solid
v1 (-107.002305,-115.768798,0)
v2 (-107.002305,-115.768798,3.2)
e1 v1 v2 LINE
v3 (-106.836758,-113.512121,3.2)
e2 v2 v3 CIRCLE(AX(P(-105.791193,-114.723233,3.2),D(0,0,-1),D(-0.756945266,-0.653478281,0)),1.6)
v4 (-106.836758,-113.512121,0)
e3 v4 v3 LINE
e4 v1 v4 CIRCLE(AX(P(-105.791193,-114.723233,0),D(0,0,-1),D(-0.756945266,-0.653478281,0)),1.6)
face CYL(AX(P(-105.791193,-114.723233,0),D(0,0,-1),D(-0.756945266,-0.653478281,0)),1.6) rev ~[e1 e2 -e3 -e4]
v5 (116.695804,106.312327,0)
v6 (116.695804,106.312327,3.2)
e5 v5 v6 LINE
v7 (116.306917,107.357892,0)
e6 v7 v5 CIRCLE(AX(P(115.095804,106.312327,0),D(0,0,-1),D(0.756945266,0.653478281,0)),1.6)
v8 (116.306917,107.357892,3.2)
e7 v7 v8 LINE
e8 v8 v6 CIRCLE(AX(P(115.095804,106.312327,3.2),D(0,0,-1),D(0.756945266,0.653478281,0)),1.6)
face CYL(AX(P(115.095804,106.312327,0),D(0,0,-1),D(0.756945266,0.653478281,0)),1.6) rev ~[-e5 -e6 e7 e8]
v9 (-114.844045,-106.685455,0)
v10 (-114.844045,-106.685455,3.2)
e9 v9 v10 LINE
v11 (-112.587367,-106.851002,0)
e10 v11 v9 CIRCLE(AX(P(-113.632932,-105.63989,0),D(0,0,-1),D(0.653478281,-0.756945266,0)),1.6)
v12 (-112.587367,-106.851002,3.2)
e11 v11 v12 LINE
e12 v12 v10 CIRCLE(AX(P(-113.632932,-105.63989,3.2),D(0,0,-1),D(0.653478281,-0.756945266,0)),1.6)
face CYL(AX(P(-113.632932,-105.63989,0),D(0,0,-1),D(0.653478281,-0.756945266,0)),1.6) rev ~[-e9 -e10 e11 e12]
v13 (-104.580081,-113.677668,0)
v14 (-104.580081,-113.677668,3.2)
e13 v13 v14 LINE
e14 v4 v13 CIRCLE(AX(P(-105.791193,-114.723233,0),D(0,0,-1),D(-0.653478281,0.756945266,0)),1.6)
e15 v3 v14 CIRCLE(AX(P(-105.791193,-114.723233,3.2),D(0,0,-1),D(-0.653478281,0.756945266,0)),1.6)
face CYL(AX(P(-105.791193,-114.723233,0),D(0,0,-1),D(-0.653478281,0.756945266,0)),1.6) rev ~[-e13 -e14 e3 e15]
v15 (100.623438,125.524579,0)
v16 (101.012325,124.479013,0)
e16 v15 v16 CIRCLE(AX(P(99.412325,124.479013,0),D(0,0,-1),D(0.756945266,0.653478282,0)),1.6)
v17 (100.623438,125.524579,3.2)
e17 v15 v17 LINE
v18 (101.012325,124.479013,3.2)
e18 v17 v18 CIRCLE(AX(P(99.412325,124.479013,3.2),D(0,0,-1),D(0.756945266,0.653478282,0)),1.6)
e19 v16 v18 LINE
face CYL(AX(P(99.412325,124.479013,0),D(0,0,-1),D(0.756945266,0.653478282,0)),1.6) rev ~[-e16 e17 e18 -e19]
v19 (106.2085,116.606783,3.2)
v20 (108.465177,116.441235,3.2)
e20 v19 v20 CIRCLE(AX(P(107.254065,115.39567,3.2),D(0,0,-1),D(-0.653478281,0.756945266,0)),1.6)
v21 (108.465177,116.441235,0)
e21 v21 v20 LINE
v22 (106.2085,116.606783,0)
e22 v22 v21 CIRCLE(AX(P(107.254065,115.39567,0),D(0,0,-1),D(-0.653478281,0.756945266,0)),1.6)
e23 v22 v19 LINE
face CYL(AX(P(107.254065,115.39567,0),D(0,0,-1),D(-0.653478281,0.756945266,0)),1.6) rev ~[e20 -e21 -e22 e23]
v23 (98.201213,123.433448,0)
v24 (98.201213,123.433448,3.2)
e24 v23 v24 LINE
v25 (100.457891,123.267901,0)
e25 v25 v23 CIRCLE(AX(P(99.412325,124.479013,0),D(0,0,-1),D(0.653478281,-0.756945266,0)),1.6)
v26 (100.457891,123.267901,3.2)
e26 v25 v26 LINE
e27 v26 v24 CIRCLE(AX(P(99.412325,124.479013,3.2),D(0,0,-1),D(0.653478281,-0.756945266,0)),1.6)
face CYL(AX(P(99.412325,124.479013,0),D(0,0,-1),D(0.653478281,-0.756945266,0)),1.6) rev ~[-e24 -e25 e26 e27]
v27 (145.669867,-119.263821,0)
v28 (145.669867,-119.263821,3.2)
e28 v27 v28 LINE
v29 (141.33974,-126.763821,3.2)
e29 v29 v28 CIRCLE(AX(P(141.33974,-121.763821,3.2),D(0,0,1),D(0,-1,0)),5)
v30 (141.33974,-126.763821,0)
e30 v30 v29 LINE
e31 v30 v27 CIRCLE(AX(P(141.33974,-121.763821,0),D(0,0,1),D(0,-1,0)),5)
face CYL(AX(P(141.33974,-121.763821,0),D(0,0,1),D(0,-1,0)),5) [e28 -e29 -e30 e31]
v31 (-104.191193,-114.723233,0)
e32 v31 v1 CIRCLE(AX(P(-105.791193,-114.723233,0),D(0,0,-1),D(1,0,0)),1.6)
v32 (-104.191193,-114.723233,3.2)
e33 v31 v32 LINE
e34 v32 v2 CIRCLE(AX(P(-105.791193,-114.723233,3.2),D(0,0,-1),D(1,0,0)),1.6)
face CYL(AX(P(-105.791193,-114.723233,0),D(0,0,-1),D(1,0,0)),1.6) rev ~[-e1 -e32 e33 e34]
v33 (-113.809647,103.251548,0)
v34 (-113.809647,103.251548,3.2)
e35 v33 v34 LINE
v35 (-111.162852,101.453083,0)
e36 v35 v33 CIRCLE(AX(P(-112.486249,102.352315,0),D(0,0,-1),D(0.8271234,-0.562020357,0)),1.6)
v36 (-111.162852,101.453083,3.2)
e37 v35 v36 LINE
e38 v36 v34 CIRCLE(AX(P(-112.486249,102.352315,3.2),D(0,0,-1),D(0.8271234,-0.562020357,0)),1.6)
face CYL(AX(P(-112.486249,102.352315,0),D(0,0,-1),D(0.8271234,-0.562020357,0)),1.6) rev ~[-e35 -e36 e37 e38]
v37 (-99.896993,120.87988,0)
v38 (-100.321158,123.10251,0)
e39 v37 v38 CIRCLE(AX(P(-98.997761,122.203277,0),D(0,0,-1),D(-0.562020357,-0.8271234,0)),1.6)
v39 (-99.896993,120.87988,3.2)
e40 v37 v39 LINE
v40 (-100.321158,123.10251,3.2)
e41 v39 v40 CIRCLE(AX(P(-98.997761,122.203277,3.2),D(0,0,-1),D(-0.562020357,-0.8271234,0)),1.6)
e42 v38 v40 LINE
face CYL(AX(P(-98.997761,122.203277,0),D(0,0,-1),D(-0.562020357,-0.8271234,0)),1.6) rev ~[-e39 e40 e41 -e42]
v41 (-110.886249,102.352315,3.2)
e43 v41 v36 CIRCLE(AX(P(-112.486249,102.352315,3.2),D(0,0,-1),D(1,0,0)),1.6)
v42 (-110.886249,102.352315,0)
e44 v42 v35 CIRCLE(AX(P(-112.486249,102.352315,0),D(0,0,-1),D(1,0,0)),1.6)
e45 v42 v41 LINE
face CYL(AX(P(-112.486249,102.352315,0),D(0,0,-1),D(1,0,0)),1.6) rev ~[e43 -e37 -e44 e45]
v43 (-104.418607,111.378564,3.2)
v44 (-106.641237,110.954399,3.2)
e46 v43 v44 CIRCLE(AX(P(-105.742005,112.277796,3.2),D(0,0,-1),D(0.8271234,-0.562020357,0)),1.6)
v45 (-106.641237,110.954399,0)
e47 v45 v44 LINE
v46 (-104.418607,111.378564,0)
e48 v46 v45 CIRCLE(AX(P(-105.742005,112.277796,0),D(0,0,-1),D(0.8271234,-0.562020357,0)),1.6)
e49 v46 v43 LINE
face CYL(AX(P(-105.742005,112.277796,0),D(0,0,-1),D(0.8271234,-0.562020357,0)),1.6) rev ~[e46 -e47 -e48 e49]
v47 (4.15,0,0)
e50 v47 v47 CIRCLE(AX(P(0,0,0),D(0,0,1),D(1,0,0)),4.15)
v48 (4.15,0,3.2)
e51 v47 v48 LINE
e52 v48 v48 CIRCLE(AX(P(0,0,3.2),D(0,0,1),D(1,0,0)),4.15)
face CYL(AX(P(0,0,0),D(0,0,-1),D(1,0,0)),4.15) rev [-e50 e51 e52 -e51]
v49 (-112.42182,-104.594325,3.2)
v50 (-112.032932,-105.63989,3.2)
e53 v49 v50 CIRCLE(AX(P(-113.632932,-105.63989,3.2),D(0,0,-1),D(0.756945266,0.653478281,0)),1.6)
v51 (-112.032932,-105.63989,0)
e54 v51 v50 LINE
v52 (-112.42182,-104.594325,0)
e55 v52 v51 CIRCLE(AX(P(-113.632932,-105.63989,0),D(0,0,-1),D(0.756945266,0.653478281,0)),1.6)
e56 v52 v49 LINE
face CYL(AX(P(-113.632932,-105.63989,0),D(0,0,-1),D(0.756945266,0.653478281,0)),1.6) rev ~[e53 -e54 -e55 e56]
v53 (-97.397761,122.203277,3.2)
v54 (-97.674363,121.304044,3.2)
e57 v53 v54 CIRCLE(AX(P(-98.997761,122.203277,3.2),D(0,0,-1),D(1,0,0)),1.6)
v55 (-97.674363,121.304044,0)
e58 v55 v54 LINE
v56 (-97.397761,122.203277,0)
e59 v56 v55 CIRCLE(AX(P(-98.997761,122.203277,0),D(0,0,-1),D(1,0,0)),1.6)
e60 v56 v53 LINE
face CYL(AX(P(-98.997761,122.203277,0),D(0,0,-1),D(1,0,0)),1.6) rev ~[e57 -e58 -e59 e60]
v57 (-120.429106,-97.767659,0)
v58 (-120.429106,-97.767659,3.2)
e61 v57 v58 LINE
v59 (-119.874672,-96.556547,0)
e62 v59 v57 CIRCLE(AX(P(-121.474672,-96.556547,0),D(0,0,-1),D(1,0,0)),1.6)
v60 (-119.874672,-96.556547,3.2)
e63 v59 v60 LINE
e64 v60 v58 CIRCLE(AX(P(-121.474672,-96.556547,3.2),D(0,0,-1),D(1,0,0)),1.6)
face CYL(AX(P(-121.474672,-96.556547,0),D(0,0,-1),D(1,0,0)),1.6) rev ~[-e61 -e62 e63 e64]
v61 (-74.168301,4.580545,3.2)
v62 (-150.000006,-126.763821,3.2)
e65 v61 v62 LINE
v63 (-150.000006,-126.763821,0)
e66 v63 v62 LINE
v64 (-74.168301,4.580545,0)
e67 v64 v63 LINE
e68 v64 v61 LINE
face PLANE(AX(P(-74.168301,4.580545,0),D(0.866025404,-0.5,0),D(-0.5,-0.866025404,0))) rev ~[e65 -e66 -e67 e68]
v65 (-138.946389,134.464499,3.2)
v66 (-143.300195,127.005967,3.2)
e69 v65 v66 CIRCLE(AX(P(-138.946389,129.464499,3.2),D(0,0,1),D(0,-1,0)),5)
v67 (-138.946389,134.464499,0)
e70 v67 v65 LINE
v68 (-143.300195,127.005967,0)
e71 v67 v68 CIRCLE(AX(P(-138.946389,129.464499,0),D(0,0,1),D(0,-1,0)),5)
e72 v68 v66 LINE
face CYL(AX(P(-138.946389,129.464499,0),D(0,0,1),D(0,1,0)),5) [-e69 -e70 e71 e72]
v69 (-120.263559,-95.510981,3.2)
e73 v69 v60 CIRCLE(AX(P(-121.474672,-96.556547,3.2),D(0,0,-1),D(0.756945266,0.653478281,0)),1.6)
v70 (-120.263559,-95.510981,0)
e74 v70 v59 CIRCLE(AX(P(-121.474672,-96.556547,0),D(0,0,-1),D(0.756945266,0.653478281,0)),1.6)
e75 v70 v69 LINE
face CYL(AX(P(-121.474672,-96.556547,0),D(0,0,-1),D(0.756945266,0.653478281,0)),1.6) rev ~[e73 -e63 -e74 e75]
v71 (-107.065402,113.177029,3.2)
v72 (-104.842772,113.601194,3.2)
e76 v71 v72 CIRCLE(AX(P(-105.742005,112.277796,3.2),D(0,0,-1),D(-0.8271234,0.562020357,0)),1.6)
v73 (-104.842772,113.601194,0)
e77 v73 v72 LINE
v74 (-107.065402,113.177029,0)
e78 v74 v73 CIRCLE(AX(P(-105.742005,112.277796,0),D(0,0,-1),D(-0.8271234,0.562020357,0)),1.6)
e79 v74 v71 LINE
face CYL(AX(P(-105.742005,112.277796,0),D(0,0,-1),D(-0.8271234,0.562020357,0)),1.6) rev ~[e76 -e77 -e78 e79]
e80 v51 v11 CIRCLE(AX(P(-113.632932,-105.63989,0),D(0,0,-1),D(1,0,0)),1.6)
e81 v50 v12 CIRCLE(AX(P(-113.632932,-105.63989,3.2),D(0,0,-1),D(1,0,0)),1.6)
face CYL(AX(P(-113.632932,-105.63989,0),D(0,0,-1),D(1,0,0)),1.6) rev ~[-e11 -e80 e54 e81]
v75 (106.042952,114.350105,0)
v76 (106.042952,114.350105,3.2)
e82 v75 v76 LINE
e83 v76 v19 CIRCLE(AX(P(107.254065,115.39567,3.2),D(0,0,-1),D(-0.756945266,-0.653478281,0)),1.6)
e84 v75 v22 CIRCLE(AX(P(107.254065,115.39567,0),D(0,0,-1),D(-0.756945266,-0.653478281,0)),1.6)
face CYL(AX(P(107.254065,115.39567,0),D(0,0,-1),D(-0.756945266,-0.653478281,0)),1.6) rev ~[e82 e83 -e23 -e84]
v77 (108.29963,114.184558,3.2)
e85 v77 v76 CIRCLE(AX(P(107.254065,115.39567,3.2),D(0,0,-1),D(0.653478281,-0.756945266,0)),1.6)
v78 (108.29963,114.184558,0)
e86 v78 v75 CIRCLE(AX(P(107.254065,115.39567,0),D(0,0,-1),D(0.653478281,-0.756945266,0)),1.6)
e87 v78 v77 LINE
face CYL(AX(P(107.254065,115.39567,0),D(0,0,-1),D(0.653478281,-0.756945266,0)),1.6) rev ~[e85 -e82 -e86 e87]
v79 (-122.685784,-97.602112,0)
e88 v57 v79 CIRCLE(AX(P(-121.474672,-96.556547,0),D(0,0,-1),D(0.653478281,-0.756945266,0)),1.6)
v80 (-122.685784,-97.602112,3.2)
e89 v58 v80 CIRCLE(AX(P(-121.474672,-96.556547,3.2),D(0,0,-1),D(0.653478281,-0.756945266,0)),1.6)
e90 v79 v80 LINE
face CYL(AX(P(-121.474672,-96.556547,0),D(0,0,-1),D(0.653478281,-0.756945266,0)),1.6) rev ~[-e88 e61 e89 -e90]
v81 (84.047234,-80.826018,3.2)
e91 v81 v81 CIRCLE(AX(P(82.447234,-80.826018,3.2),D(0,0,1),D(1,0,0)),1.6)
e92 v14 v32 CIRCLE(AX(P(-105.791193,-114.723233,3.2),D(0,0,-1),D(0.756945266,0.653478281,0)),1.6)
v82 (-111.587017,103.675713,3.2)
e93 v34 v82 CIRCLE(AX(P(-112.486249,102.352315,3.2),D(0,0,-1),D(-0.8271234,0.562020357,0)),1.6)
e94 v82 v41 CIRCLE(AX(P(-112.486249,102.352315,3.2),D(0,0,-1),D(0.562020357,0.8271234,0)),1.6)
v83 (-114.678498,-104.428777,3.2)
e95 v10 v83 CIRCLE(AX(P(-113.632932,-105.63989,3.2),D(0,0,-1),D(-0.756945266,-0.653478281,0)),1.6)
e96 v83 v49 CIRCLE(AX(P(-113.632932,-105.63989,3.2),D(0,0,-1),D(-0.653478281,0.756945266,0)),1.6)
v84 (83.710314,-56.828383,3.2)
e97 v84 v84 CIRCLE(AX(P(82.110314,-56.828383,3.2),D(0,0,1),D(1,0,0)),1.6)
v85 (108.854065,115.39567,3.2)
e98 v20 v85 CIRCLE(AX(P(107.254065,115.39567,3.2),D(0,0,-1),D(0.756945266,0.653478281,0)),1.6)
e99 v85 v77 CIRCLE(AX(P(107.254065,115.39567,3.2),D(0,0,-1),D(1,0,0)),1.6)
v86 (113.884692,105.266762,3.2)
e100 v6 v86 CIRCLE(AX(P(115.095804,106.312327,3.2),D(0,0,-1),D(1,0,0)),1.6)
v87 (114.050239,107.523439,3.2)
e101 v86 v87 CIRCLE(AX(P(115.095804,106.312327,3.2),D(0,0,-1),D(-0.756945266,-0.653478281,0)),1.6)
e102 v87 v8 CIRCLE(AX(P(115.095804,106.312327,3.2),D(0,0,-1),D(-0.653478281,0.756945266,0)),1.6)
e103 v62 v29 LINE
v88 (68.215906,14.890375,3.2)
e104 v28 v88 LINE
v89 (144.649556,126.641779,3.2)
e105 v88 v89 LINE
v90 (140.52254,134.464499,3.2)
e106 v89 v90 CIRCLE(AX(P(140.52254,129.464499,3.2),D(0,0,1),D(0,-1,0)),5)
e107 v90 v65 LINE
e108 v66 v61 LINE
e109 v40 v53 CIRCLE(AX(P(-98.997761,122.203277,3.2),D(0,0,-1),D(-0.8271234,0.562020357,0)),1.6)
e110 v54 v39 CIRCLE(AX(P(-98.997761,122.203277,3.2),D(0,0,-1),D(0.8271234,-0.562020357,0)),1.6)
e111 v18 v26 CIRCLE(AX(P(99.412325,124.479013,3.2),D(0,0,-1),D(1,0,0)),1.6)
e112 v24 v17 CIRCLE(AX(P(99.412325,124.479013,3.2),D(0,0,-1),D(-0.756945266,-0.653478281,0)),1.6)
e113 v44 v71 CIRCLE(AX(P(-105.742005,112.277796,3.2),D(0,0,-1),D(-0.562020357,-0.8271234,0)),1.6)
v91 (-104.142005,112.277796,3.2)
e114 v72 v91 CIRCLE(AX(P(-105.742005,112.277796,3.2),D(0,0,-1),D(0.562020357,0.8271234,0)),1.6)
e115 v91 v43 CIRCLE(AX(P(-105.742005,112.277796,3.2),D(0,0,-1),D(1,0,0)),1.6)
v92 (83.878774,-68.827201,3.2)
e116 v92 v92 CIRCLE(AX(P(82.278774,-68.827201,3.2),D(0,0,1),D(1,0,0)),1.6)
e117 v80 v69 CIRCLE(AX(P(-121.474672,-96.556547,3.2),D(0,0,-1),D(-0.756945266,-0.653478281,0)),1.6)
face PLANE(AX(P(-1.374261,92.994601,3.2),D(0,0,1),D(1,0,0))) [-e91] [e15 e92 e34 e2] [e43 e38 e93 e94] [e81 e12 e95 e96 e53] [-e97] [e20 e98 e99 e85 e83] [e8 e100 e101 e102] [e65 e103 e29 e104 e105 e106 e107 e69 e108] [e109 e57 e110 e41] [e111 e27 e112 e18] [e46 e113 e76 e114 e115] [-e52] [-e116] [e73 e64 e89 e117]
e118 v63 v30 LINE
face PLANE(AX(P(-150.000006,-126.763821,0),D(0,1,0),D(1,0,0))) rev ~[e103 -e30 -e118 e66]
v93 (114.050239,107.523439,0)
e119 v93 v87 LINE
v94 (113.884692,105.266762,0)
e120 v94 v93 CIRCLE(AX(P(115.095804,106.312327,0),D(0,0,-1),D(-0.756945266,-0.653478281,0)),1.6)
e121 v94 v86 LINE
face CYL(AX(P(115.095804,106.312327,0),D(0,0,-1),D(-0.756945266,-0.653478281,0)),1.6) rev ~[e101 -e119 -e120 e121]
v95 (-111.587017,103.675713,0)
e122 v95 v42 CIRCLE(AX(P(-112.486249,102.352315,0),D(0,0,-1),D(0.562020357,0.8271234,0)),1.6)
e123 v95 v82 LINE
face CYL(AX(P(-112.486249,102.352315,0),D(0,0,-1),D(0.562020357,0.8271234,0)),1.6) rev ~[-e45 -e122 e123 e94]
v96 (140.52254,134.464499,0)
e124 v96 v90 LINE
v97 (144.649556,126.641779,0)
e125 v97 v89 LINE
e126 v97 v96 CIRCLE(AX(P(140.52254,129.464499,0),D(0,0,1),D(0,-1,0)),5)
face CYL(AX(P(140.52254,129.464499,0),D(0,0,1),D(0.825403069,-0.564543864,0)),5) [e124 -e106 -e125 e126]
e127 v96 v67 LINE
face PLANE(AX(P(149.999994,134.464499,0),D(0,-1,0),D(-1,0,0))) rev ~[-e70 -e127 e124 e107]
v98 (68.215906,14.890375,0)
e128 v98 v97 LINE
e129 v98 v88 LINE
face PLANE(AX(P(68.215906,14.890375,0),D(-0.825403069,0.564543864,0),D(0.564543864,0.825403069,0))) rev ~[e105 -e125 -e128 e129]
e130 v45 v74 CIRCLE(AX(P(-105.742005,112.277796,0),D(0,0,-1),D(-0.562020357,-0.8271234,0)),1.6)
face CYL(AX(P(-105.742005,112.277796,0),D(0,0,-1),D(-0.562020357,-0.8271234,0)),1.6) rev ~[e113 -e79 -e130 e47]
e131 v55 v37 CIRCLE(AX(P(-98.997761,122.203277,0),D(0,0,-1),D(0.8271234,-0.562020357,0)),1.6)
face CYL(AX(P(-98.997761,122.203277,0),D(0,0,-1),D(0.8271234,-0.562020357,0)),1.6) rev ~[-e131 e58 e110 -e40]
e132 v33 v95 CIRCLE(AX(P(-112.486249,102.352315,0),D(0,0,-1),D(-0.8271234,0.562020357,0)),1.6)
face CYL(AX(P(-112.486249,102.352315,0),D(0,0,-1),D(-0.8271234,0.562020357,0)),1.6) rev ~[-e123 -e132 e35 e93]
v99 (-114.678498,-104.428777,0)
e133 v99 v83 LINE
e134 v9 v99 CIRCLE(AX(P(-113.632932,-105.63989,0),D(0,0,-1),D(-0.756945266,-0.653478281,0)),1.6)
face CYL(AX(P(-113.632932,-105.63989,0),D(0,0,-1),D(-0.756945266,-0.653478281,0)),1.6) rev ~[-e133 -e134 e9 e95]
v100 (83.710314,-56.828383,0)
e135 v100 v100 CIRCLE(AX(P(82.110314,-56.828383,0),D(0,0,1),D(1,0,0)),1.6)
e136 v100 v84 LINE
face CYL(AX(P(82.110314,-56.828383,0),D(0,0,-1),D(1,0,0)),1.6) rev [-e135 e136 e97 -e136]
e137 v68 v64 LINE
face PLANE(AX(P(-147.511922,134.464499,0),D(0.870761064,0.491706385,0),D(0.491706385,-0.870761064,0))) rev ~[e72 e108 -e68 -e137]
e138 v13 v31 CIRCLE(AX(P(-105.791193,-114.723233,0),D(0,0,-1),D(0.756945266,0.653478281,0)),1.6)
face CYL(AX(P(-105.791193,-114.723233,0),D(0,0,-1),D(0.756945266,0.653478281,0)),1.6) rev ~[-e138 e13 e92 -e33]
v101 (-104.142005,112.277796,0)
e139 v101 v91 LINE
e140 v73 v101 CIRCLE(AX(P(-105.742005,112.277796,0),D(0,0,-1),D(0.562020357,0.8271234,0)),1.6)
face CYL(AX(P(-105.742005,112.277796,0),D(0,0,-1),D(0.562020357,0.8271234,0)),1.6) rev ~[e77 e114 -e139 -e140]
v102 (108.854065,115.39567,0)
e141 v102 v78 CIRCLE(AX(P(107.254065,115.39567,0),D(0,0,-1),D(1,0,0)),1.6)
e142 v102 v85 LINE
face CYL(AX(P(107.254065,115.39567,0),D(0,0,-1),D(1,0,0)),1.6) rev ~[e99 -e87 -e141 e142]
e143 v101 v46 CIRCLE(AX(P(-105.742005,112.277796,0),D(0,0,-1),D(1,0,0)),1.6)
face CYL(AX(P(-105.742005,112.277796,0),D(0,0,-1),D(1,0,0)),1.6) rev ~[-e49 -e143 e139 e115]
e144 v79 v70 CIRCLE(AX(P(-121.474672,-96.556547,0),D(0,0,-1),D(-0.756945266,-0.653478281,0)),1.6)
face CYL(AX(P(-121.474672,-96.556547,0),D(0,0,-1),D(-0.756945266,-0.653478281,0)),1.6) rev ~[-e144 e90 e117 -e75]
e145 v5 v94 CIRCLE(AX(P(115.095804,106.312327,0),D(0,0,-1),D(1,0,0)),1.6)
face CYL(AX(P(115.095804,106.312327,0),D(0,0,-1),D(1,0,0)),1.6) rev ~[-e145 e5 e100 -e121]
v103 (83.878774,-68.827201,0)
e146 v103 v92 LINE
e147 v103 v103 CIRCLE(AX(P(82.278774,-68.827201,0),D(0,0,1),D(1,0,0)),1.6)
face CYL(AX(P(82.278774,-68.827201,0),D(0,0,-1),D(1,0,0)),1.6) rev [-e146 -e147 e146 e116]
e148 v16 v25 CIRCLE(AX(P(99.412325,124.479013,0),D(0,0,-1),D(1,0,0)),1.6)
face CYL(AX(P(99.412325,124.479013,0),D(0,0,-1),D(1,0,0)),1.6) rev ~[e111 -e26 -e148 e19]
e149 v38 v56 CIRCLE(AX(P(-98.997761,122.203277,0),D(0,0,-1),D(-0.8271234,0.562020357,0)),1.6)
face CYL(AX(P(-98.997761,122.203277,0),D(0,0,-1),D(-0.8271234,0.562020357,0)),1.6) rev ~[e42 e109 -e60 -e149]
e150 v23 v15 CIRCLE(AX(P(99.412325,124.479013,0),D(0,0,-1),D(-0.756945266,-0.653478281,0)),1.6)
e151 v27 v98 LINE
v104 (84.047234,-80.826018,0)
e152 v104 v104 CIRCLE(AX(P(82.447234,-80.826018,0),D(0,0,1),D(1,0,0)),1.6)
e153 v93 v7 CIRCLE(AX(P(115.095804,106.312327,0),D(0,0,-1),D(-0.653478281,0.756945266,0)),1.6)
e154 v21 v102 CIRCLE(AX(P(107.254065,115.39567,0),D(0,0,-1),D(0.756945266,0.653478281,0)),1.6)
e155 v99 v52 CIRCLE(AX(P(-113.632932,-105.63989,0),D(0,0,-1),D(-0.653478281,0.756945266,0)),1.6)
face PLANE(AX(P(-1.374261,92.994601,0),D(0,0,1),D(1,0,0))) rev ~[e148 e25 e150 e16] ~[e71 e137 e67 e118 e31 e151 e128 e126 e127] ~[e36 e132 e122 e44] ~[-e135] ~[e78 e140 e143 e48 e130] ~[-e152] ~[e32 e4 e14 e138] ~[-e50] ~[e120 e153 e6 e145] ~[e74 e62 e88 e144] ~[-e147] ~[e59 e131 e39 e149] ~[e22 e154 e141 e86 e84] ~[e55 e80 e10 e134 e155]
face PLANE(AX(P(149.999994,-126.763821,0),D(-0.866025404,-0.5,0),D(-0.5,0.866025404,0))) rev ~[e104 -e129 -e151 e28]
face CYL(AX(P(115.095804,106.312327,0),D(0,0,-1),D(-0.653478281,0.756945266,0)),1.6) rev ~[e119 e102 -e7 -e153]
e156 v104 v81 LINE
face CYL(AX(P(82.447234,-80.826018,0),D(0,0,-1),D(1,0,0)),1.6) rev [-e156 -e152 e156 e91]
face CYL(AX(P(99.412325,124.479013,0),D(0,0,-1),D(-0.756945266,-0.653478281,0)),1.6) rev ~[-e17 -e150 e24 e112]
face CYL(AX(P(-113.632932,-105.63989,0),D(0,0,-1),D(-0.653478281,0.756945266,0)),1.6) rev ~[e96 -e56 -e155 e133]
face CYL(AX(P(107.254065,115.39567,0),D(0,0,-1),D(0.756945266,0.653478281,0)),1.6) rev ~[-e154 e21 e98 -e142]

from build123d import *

# Parameters (mm, degrees)
F0_R     = 1.6
F0_R_2   = 4.15
F1_DEPTH = 3.2
F2_R     = 5


# Not quite as in the source:
# - a feature names something its author has since deleted; it is built from what else it names


with BuildPart() as f1:
    # F0 (on Top) → F1 (new body)
    with BuildSketch(Plane.XY):
        Polygon((-147.5119216098, 134.4644985315), (-74.1683009258, 4.5805452964), (-5.9605e-06, 133.0438004871), (68.2159057757, 14.8903754755), (149.9999940395, 134.4644985315), align=None)
        with BuildLine():
            Line((-96.8504283589, 106.236077336), (-103.5946726395, 96.3105965374))
            Line((-103.5946726395, 96.3105965374), (-111.1628517485, 101.4530828014))
            ThreePointArc((-111.1628517485, 101.4530828014), (-113.385481759, 101.0289179323), (-113.8096466281, 103.2515479429))
            Line((-113.8096466281, 103.2515479429), (-121.377825737, 108.3940342069))
            Line((-121.377825737, 108.3940342069), (-114.6335814564, 118.3195150055))
            Line((-114.6335814564, 118.3195150055), (-107.8893371757, 128.244995804))
            Line((-107.8893371757, 128.244995804), (-100.3211580668, 123.10250954))
            ThreePointArc((-100.3211580668, 123.10250954), (-98.5273543684, 123.7325637154), (-97.397760627, 122.2032769693))
            ThreePointArc((-97.397760627, 122.2032769693), (-97.4684738809, 121.7328707107), (-97.6743631872, 121.3040443985))
            Line((-97.6743631872, 121.3040443985), (-90.1061840783, 116.1615581346))
            Line((-90.1061840783, 116.1615581346), (-96.8504283589, 106.236077336))
        make_face(mode=Mode.SUBTRACT)
        with BuildLine():
            Line((115.3912264438, 122.4205616549), (123.2329658209, 113.3372184629))
            Line((123.2329658209, 113.3372184629), (116.306916637, 107.3578921879))
            ThreePointArc((116.306916637, 107.3578921879), (116.5954341459, 106.870099346), (116.6958042114, 106.3123269377))
            ThreePointArc((116.6958042114, 106.3123269377), (115.6535766198, 104.8126970032), (113.8846917858, 105.2667616874))
            Line((113.8846917858, 105.2667616874), (106.958642602, 99.2874354124))
            Line((106.958642602, 99.2874354124), (99.1169032249, 108.3707786044))
            Line((99.1169032249, 108.3707786044), (91.2751638479, 117.4541217963))
            Line((91.2751638479, 117.4541217963), (98.2012130318, 123.4334480713))
            ThreePointArc((98.2012130318, 123.4334480713), (98.3667602071, 125.6901257472), (100.6234378829, 125.5245785718))
            Line((100.6234378829, 125.5245785718), (107.5494870668, 131.5039048468))
            Line((107.5494870668, 131.5039048468), (115.3912264438, 122.4205616549))
        make_face(mode=Mode.SUBTRACT)
        Polygon((-74.1683009258, 4.5805452964), (-5.9605e-06, -126.7638206482), (49.5534456811, -23.8632776696), (68.2159057757, 14.8903754755), (-5.9605e-06, 133.0438004871), align=None)
        with BuildLine():
            ThreePointArc((55, 0), (53.6210756721, -12.2384739151), (49.5534456811, -23.8632776696))
            ThreePointArc((49.5534456811, -23.8632776696), (-53.6210756721, 12.2384739151), (55, 0))
        make_face(mode=Mode.SUBTRACT)
        Polygon((49.5534456811, -23.8632776696), (-5.9605e-06, -126.7638206482), (149.9999940395, -126.7638206482), (68.2159057757, 14.8903754755), align=None)
        with Locations((82.4472344942, -80.8260182953)):
            Circle(F0_R, mode=Mode.SUBTRACT)
        with Locations((82.2787740784, -68.8272008082)):
            Circle(F0_R, mode=Mode.SUBTRACT)
        with Locations((82.1103136625, -56.8283833211)):
            Circle(F0_R, mode=Mode.SUBTRACT)
        Polygon((-74.1683009258, 4.5805452964), (-150.0000059605, -126.7638206482), (-5.9605e-06, -126.7638206482), align=None)
        with BuildLine():
            Line((-105.4957706959, -98.6149983111), (-97.6540313188, -107.698341503))
            Line((-97.6540313188, -107.698341503), (-104.5800805027, -113.677667778))
            ThreePointArc((-104.5800805027, -113.677667778), (-104.2915629938, -114.1654606199), (-104.1911929283, -114.7232330283))
            ThreePointArc((-104.1911929283, -114.7232330283), (-105.2334205199, -116.2228629628), (-107.0023053539, -115.7687982785))
            Line((-107.0023053539, -115.7687982785), (-113.9283545378, -121.7481245535))
            Line((-113.9283545378, -121.7481245535), (-121.7700939148, -112.6647813616))
            Line((-121.7700939148, -112.6647813616), (-129.6118332918, -103.5814381696))
            Line((-129.6118332918, -103.5814381696), (-122.685784108, -97.6021118946))
            ThreePointArc((-122.685784108, -97.6021118946), (-122.5202369326, -95.3454342188), (-120.2635592568, -95.5109813941))
            Line((-120.2635592568, -95.5109813941), (-113.3375100729, -89.5316551191))
            Line((-113.3375100729, -89.5316551191), (-105.4957706959, -98.6149983111))
        make_face(mode=Mode.SUBTRACT)
        with BuildLine():
            ThreePointArc((55, 0), (-53.6210756721, 12.2384739151), (49.5534456811, -23.8632776696))
            ThreePointArc((49.5534456811, -23.8632776696), (53.6210756721, -12.2384739151), (55, 0))
        make_face()
        Circle(F0_R_2, mode=Mode.SUBTRACT)
        with BuildLine():
            Line((-111.1628517485, 101.4530828014), (-103.5946726395, 96.3105965374))
            Line((-103.5946726395, 96.3105965374), (-96.8504283589, 106.236077336))
            Line((-96.8504283589, 106.236077336), (-104.4186074678, 111.3785636))
            ThreePointArc((-104.4186074678, 111.3785636), (-105.4420750524, 110.7061594182), (-106.6412374784, 110.9543987309))
            Line((-106.6412374784, 110.9543987309), (-111.5870166175, 103.6757128119))
            ThreePointArc((-111.5870166175, 103.6757128119), (-111.0722527043, 103.1010569453), (-110.8862491883, 102.3523153721))
            ThreePointArc((-110.8862491883, 102.3523153721), (-110.9569624422, 101.8819091135), (-111.1628517485, 101.4530828014))
        make_face()
        with BuildLine():
            Line((-104.4186074678, 111.3785636), (-96.8504283589, 106.236077336))
            Line((-96.8504283589, 106.236077336), (-90.1061840783, 116.1615581346))
            Line((-90.1061840783, 116.1615581346), (-97.6743631872, 121.3040443985))
            ThreePointArc((-97.6743631872, 121.3040443985), (-98.6978307717, 120.6316402168), (-99.8969931977, 120.8798795295))
            Line((-99.8969931977, 120.8798795295), (-104.8427723369, 113.6011936105))
            ThreePointArc((-104.8427723369, 113.6011936105), (-104.3280084237, 113.0265377439), (-104.1420049076, 112.2777961707))
            ThreePointArc((-104.1420049076, 112.2777961707), (-104.2127181615, 111.8073899121), (-104.4186074678, 111.3785636))
        make_face()
        with BuildLine():
            Line((-121.377825737, 108.3940342069), (-113.8096466281, 103.2515479429))
            ThreePointArc((-113.8096466281, 103.2515479429), (-112.7861790435, 103.9239521247), (-111.5870166175, 103.6757128119))
            Line((-111.5870166175, 103.6757128119), (-106.6412374784, 110.9543987309))
            ThreePointArc((-106.6412374784, 110.9543987309), (-107.3136416602, 111.9778663155), (-107.0654023474, 113.1770287415))
            Line((-107.0654023474, 113.1770287415), (-114.6335814564, 118.3195150055))
            Line((-114.6335814564, 118.3195150055), (-121.377825737, 108.3940342069))
        make_face()
        with BuildLine():
            Line((-107.8893371757, 128.244995804), (-114.6335814564, 118.3195150055))
            Line((-114.6335814564, 118.3195150055), (-107.0654023474, 113.1770287415))
            ThreePointArc((-107.0654023474, 113.1770287415), (-106.0419347629, 113.8494329232), (-104.8427723369, 113.6011936105))
            Line((-104.8427723369, 113.6011936105), (-99.8969931977, 120.8798795295))
            ThreePointArc((-99.8969931977, 120.8798795295), (-100.5693973795, 121.903347114), (-100.3211580668, 123.10250954))
            Line((-100.3211580668, 123.10250954), (-107.8893371757, 128.244995804))
        make_face()
        with BuildLine():
            Line((-104.5800805027, -113.677667778), (-97.6540313188, -107.698341503))
            Line((-97.6540313188, -107.698341503), (-105.4957706959, -98.6149983111))
            Line((-105.4957706959, -98.6149983111), (-112.4218198797, -104.594324586))
            ThreePointArc((-112.4218198797, -104.594324586), (-112.1333023708, -105.082117428), (-112.0329323053, -105.6398898363))
            ThreePointArc((-112.0329323053, -105.6398898363), (-112.1781291571, -106.30588368), (-112.5873670551, -106.8510022619))
            Line((-112.5873670551, -106.8510022619), (-106.8367581786, -113.5121206027))
            ThreePointArc((-106.8367581786, -113.5121206027), (-105.674133398, -113.1275209407), (-104.5800805027, -113.677667778))
        make_face()
        with BuildLine():
            Line((-112.4218198797, -104.594324586), (-105.4957706959, -98.6149983111))
            Line((-105.4957706959, -98.6149983111), (-113.3375100729, -89.5316551191))
            Line((-113.3375100729, -89.5316551191), (-120.2635592568, -95.5109813941))
            ThreePointArc((-120.2635592568, -95.5109813941), (-119.9750417479, -95.998774236), (-119.8746716824, -96.5565466444))
            ThreePointArc((-119.8746716824, -96.5565466444), (-120.0198685341, -97.222540488), (-120.4291064321, -97.76765907))
            Line((-120.4291064321, -97.76765907), (-114.6784975556, -104.4287774107))
            ThreePointArc((-114.6784975556, -104.4287774107), (-113.5158727751, -104.0441777488), (-112.4218198797, -104.594324586))
        make_face()
        with BuildLine():
            ThreePointArc((-107.0023053539, -115.7687982785), (-107.3869050159, -114.606173498), (-106.8367581786, -113.5121206027))
            Line((-106.8367581786, -113.5121206027), (-112.5873670551, -106.8510022619))
            ThreePointArc((-112.5873670551, -106.8510022619), (-113.7499918356, -107.2356019239), (-114.8440447309, -106.6854550866))
            Line((-114.8440447309, -106.6854550866), (-121.7700939148, -112.6647813616))
            Line((-121.7700939148, -112.6647813616), (-113.9283545378, -121.7481245535))
            Line((-113.9283545378, -121.7481245535), (-107.0023053539, -115.7687982785))
        make_face()
        with BuildLine():
            ThreePointArc((-114.8440447309, -106.6854550866), (-115.2286443929, -105.522830306), (-114.6784975556, -104.4287774107))
            Line((-114.6784975556, -104.4287774107), (-120.4291064321, -97.76765907))
            ThreePointArc((-120.4291064321, -97.76765907), (-121.5917312126, -98.1522587319), (-122.685784108, -97.6021118946))
            Line((-122.685784108, -97.6021118946), (-129.6118332918, -103.5814381696))
            Line((-129.6118332918, -103.5814381696), (-121.7700939148, -112.6647813616))
            Line((-121.7700939148, -112.6647813616), (-114.8440447309, -106.6854550866))
        make_face()
        with BuildLine():
            Line((116.306916637, 107.3578921879), (123.2329658209, 113.3372184629))
            Line((123.2329658209, 113.3372184629), (115.3912264438, 122.4205616549))
            Line((115.3912264438, 122.4205616549), (108.46517726, 116.4412353799))
            ThreePointArc((108.46517726, 116.4412353799), (108.7536947689, 115.953442538), (108.8540648344, 115.3956701296))
            ThreePointArc((108.8540648344, 115.3956701296), (108.7088679827, 114.729676286), (108.2996300847, 114.184557704))
            Line((108.2996300847, 114.184557704), (114.0502389611, 107.5234393633))
            ThreePointArc((114.0502389611, 107.5234393633), (115.2128637417, 107.9080390252), (116.306916637, 107.3578921879))
        make_face()
        with BuildLine():
            Line((108.46517726, 116.4412353799), (115.3912264438, 122.4205616549))
            Line((115.3912264438, 122.4205616549), (107.5494870668, 131.5039048468))
            Line((107.5494870668, 131.5039048468), (100.6234378829, 125.5245785718))
            ThreePointArc((100.6234378829, 125.5245785718), (100.9119553919, 125.0367857299), (101.0123254573, 124.4790133216))
            ThreePointArc((101.0123254573, 124.4790133216), (100.8671286056, 123.8130194779), (100.4578907076, 123.267900896))
            Line((100.4578907076, 123.267900896), (106.2084995841, 116.6067825552))
            ThreePointArc((106.2084995841, 116.6067825552), (107.3711243647, 116.9913822172), (108.46517726, 116.4412353799))
        make_face()
        with BuildLine():
            ThreePointArc((113.8846917858, 105.2667616874), (113.5000921239, 106.4293864679), (114.0502389611, 107.5234393633))
            Line((114.0502389611, 107.5234393633), (108.2996300847, 114.184557704))
            ThreePointArc((108.2996300847, 114.184557704), (107.1370053041, 113.7999580421), (106.0429524088, 114.3501048793))
            Line((106.0429524088, 114.3501048793), (99.1169032249, 108.3707786044))
            Line((99.1169032249, 108.3707786044), (106.958642602, 99.2874354124))
            Line((106.958642602, 99.2874354124), (113.8846917858, 105.2667616874))
        make_face()
        with BuildLine():
            ThreePointArc((106.0429524088, 114.3501048793), (105.6583527468, 115.5127296599), (106.2084995841, 116.6067825552))
            Line((106.2084995841, 116.6067825552), (100.4578907076, 123.267900896))
            ThreePointArc((100.4578907076, 123.267900896), (99.2952659271, 122.883301234), (98.2012130318, 123.4334480713))
            Line((98.2012130318, 123.4334480713), (91.2751638479, 117.4541217963))
            Line((91.2751638479, 117.4541217963), (99.1169032249, 108.3707786044))
            Line((99.1169032249, 108.3707786044), (106.0429524088, 114.3501048793))
        make_face()
    extrude(amount=F1_DEPTH)

    # F2
    f2_edges = [f1.edges().sort_by_distance(p)[0] for p in [
        (149.999994, -126.763821, 1.6),
        (149.999994, 134.464499, 1.6),
        (-147.511922, 134.464499, 1.6),
    ]]
    fillet(f2_edges, radius=F2_R)


solid = f1.part
